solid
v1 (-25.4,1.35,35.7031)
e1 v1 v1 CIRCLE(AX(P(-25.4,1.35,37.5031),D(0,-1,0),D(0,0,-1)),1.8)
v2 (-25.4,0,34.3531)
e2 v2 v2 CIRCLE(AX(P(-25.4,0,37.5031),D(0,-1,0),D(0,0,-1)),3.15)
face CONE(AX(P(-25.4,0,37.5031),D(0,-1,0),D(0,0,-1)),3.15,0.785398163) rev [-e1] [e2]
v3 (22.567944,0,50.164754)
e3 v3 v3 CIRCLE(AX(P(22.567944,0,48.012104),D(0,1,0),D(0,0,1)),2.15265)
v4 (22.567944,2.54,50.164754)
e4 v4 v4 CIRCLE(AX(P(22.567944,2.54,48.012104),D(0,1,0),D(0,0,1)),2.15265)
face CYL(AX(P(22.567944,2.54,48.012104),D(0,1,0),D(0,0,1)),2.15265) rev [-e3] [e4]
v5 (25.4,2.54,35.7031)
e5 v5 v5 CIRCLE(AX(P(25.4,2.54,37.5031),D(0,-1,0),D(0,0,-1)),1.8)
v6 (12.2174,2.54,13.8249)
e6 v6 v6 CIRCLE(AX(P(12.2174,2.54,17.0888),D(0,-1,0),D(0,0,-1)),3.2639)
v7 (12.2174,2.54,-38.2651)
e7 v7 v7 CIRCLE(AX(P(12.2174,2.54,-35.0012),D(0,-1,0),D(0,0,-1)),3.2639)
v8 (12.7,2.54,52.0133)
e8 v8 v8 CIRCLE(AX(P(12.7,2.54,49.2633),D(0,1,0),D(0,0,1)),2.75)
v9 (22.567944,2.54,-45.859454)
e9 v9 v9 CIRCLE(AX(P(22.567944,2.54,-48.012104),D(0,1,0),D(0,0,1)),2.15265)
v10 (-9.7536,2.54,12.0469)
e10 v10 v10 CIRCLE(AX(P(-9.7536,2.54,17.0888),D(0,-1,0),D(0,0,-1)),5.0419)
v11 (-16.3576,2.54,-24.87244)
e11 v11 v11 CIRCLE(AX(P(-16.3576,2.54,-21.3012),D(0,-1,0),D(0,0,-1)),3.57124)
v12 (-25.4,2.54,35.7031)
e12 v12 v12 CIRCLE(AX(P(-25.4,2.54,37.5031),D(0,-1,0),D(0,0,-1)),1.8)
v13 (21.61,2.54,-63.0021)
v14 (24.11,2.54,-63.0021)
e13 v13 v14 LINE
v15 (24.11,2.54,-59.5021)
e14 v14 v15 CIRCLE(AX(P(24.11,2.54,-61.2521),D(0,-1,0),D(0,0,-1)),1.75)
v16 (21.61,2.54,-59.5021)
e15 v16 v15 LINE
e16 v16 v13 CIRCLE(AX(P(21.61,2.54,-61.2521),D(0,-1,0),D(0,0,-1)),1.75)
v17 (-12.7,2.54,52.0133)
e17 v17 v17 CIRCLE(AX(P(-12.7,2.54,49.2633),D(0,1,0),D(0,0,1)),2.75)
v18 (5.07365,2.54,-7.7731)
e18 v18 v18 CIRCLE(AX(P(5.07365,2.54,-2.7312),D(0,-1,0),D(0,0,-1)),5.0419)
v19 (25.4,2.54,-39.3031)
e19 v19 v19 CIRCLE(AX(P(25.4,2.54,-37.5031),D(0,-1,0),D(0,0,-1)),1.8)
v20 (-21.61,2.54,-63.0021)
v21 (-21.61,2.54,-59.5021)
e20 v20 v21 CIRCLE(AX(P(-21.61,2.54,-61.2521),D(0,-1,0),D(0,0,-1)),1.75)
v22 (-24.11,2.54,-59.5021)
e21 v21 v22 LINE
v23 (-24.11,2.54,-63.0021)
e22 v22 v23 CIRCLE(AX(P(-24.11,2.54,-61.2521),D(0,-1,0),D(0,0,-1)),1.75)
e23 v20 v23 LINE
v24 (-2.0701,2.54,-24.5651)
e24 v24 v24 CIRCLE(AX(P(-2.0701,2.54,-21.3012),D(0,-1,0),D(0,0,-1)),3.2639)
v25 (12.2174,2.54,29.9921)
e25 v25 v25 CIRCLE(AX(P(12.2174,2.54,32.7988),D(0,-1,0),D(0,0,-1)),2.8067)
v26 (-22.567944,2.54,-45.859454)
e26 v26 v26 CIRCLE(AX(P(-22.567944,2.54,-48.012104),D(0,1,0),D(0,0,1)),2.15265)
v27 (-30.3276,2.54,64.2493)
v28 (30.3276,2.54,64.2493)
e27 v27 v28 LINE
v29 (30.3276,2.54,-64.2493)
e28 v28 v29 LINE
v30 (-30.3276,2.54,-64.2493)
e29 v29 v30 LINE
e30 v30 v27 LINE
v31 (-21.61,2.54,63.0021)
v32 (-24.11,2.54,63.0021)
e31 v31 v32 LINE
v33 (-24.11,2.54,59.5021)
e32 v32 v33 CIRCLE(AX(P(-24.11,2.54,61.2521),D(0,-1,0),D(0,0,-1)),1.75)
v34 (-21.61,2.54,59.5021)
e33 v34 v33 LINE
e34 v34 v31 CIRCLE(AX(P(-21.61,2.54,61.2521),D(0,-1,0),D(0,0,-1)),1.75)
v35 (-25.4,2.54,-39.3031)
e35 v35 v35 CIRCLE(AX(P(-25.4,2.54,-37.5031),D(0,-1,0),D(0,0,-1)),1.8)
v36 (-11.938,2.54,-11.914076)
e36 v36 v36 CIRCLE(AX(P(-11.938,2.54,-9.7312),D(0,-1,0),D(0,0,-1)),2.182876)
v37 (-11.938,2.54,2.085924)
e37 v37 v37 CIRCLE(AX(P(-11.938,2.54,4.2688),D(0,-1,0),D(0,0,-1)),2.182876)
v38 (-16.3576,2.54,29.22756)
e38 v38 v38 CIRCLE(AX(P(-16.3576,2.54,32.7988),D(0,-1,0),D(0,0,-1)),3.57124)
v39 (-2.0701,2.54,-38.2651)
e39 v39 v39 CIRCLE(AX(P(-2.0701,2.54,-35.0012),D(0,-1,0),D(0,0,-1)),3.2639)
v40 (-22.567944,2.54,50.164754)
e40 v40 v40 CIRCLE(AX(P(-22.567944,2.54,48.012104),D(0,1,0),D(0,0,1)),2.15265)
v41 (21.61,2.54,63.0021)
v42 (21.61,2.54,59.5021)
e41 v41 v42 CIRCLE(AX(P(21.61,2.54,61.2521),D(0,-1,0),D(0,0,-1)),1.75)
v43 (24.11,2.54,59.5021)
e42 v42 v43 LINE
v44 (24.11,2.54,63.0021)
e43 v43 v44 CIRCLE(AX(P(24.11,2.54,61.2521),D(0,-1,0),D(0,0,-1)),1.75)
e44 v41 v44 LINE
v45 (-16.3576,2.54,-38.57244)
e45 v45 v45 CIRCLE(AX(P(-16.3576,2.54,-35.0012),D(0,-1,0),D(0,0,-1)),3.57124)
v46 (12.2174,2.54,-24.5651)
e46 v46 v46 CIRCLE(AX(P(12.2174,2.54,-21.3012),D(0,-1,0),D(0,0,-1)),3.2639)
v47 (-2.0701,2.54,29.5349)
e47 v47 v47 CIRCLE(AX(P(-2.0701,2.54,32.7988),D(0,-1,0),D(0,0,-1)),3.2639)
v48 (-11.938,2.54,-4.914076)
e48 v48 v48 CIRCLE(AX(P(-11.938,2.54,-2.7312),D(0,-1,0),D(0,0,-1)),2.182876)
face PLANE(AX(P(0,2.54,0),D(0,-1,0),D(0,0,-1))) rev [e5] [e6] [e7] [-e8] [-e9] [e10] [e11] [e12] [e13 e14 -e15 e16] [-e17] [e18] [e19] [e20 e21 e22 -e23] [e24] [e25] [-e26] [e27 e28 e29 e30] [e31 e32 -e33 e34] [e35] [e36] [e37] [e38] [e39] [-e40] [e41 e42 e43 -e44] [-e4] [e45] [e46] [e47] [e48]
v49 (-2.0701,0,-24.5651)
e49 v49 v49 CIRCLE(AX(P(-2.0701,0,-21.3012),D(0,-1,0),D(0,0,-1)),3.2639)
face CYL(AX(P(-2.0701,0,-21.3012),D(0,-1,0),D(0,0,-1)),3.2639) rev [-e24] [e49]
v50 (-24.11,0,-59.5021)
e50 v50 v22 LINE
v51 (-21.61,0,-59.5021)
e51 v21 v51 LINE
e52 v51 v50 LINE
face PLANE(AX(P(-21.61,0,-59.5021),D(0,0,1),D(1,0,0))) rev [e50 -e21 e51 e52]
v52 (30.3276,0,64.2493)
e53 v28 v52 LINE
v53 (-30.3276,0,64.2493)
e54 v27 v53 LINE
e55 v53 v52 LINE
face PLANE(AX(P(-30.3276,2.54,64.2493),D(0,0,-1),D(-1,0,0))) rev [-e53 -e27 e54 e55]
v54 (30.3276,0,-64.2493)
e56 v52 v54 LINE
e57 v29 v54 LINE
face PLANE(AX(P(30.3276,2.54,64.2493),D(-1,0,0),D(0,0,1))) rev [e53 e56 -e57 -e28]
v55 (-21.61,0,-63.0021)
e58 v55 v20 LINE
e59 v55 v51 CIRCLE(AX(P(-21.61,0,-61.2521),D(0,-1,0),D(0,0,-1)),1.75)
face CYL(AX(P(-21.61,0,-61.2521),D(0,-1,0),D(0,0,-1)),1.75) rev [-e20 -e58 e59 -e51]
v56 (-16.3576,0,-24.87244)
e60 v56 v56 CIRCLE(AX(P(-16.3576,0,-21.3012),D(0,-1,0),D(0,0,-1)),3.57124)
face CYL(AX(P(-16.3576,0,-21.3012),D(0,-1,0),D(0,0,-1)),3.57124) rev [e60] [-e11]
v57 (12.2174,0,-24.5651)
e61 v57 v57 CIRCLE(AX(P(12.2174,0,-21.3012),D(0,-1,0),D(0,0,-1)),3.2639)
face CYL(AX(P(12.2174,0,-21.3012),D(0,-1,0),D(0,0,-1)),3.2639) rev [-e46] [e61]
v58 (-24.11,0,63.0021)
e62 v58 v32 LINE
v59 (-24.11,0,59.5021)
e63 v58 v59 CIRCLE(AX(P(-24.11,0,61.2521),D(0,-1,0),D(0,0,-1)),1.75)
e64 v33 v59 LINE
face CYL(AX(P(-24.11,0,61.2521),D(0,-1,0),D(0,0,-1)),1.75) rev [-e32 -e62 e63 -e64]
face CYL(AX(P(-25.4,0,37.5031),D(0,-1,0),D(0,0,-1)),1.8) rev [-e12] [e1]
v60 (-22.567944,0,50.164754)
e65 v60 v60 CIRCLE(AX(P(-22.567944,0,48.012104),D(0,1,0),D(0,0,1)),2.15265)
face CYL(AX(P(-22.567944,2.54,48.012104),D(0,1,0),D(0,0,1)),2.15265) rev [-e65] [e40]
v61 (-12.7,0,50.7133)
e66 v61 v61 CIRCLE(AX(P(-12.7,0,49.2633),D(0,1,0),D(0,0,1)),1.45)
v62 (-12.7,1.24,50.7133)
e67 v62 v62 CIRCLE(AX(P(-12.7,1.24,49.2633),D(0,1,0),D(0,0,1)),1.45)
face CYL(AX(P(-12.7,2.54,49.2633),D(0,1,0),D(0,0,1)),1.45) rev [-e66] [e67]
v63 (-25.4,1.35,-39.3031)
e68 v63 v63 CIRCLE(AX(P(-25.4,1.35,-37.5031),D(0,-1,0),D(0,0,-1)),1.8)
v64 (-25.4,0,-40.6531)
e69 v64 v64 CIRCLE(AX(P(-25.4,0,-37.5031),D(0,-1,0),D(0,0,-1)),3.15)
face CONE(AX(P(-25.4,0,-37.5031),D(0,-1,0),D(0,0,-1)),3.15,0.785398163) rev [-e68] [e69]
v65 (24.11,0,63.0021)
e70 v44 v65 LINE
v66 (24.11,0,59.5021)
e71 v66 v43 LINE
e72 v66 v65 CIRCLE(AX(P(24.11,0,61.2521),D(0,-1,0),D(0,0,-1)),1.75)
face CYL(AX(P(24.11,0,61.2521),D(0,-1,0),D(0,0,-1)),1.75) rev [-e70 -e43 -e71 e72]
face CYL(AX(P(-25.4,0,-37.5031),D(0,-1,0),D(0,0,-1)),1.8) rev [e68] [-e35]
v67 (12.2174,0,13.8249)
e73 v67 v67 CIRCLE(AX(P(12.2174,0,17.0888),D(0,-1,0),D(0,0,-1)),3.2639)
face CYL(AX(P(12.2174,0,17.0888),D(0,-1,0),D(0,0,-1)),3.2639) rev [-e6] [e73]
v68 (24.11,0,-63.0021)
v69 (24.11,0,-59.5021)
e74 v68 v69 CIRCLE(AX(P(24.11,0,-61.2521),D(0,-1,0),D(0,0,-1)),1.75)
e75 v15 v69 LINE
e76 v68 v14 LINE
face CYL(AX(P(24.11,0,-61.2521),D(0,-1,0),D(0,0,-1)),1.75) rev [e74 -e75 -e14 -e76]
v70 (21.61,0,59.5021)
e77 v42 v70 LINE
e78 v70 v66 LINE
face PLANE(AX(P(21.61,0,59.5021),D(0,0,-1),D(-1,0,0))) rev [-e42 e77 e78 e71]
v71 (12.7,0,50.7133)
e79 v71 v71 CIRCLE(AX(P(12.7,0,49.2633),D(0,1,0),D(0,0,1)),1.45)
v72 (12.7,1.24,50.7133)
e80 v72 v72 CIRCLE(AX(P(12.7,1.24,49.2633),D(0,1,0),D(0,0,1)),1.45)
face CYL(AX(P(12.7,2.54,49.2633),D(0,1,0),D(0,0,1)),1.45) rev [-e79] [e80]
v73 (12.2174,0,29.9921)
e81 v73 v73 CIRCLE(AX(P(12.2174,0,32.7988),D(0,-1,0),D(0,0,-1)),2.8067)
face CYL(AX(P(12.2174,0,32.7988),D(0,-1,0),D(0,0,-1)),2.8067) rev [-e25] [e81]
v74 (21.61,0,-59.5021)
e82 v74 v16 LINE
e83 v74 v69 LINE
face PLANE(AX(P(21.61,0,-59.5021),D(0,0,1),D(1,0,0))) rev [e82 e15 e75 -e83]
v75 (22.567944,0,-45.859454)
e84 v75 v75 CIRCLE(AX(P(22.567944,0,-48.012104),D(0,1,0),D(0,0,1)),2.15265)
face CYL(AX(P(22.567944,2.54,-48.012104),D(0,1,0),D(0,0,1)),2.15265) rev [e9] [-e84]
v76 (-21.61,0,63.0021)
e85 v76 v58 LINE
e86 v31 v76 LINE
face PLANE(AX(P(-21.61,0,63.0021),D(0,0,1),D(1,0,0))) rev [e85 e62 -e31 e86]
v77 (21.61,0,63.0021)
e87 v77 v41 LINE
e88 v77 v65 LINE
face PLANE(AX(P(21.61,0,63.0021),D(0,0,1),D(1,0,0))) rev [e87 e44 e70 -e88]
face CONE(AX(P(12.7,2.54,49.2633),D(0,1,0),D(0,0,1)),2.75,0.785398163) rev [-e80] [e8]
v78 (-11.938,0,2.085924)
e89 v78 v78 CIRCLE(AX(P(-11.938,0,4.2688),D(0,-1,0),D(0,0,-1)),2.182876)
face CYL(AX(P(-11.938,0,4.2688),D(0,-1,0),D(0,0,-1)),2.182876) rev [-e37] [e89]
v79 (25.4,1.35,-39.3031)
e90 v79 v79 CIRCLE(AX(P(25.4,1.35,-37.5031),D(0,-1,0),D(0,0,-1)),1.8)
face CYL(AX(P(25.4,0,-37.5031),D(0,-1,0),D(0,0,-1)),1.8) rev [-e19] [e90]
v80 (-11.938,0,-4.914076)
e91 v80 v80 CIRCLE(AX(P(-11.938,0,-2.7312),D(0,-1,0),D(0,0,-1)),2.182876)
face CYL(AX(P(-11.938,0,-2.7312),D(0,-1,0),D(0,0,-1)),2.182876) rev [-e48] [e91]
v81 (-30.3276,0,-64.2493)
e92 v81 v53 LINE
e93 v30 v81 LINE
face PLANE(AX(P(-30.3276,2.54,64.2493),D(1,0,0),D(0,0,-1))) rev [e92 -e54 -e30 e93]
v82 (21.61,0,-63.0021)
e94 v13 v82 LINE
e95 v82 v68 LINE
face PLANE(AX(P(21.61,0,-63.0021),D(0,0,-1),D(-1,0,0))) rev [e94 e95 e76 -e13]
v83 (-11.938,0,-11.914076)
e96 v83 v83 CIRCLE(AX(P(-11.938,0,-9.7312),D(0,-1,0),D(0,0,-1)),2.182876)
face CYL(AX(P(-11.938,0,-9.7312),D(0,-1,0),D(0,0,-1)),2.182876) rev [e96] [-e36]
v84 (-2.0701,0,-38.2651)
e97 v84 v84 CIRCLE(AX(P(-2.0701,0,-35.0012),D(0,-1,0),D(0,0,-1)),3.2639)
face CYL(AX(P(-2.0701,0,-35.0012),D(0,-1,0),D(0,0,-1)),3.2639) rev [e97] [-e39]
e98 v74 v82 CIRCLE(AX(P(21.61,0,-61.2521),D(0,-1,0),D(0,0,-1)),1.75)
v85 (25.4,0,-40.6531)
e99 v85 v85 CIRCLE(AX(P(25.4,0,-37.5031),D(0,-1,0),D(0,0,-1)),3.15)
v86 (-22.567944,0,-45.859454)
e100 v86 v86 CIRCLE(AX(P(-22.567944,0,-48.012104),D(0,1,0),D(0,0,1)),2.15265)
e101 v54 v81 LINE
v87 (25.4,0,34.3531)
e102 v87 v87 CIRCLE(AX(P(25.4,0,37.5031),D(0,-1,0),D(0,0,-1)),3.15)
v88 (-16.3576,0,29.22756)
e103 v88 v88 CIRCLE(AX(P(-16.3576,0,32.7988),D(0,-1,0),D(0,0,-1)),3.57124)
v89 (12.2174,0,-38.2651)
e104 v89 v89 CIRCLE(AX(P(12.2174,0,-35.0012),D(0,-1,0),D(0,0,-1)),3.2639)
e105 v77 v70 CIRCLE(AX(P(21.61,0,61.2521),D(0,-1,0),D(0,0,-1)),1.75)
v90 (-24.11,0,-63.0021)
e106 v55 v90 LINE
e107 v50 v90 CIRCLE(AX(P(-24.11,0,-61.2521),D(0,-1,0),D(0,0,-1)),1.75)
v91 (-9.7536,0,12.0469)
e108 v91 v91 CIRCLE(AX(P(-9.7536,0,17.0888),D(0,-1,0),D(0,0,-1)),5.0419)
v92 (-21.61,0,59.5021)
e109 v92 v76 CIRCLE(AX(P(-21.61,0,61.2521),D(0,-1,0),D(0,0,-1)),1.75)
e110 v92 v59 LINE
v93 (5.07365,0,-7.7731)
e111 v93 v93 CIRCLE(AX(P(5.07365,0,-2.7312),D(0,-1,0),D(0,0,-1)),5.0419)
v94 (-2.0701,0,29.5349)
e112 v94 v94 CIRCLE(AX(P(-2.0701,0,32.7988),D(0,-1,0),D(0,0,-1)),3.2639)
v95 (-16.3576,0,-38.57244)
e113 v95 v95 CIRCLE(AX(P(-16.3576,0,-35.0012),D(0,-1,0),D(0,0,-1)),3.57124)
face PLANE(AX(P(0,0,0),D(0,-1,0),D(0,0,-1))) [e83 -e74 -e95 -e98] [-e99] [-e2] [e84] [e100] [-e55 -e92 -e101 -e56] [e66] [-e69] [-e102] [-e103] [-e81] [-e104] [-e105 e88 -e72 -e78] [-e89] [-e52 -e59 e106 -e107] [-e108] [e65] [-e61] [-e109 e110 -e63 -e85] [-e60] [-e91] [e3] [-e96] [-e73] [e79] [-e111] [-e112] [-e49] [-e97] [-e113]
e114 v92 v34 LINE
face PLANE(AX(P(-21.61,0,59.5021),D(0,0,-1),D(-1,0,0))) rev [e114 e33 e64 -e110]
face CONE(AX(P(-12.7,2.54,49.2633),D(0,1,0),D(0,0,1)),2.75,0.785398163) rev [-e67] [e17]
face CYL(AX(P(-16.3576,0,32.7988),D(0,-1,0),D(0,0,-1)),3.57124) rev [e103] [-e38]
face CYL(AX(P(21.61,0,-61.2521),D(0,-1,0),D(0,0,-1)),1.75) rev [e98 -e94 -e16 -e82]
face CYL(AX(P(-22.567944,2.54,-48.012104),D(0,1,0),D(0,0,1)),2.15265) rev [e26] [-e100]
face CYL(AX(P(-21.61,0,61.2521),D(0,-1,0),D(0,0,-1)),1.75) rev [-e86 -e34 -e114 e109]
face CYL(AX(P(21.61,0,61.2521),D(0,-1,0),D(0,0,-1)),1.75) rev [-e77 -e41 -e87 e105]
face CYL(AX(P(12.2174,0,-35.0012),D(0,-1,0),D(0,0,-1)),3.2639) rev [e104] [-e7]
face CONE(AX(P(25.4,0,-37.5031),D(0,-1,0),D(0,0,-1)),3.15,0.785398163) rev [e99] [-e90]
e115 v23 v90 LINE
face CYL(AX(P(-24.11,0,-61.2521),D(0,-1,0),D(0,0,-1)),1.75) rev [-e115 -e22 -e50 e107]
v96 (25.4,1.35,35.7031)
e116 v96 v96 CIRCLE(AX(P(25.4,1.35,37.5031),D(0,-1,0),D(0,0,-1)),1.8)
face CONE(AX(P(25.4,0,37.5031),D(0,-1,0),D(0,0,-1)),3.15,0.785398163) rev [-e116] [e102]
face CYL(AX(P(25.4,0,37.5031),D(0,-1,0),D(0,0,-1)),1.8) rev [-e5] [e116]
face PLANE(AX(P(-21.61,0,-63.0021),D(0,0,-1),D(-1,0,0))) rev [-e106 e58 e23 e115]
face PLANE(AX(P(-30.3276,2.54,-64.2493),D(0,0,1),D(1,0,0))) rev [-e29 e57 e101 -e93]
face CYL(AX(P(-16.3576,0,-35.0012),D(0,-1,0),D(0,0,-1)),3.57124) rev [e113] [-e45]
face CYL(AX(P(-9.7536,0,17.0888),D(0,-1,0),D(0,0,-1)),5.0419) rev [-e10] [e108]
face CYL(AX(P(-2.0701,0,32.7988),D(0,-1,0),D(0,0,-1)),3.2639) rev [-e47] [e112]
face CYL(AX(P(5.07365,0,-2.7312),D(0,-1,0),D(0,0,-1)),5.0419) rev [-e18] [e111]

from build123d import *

# Parameters (mm, degrees)
SKETCH1_W                                      = 60.6552
SKETCH1_H                                      = 128.4986
BOSS_EXTRUDE1_DEPTH                            = 2.54
CSK_FOR_M3_FLAT_HEAD_MACHINE_SCREW1_AT_2_COUNT = 2
CSK_FOR_M3_FLAT_HEAD_MACHINE_SCREW1_AT_2_PITCH = 75.0062
M3_CLEARANCE_SLOT1_DEPTH                       = 2.54
F_1_4_CLEARANCE_HOLE1_D                        = 7.14248
F_1_4_CLEARANCE_HOLE2_D                        = 6.5278
F_3_8_CLEARANCE_HOLE2_D                        = 10.0838
F_10_CLEARANCE_HOLE1_D                         = 5.6134
CSK_FOR_M2_5_FLAT_HEAD_MACHINE_SCREW1_AT_COUNT = 2
CSK_FOR_M2_5_FLAT_HEAD_MACHINE_SCREW1_AT_PITCH = 25.4
F_11_64_0_17188_DIAMETER_HOLE1_D               = 4.365752
F_6_CLEARANCE_HOLE1_D                          = 4.3053


# Read off the part's stored shape, not the designer's step: M3 Clearance Slot1
with BuildPart() as part:
    # Sketch1 → Boss-Extrude1 (new body)
    with BuildSketch(Plane(origin=(0, 0, 0), x_dir=(1, 0, 0), z_dir=(0, 1, 0))):
        Rectangle(SKETCH1_W, SKETCH1_H)
    extrude(amount=BOSS_EXTRUDE1_DEPTH)

    # Sketch5 → CSK for M3 Flat Head Machine Screw1 (revolve, cut)
    with BuildSketch(Plane(origin=(25.4, 0, -37.5031), x_dir=(0, 0, -1), z_dir=(1, 0, 0))):
        Polygon((0, 0), (0, 2.54), (1.8, 2.54), (1.8, 1.35), (3.15, 0), align=None)
    csk_for_m3_flat_head_machine_screw1 = revolve(axis=Axis((25.4, -6.35, -37.5031), (0, 1, 0)), mode=Mode.SUBTRACT)

    # CSK for M3 Flat Head Machine Screw1 at 2: CSK for M3 Flat Head Machine Screw1 ×2
    with Locations(*[(0, 0, i * CSK_FOR_M3_FLAT_HEAD_MACHINE_SCREW1_AT_2_PITCH) for i in range(1, CSK_FOR_M3_FLAT_HEAD_MACHINE_SCREW1_AT_2_COUNT)]):
        add(csk_for_m3_flat_head_machine_screw1, mode=Mode.SUBTRACT)

    # M3 Clearance Slot1 outline → M3 Clearance Slot1 (cut)
    with BuildSketch(Plane(origin=(0, 0, 0), x_dir=(1, 0, 0), z_dir=(0, 1, 0))):
        with BuildLine():
            ThreePointArc((24.11, -63.0021), (25.86, -61.2521), (24.11, -59.5021))
            Line((24.11, -59.5021), (21.61, -59.5021))
            ThreePointArc((21.61, -59.5021), (19.86, -61.2521), (21.61, -63.0021))
            Line((21.61, -63.0021), (24.11, -63.0021))
        make_face()
        with BuildLine():
            ThreePointArc((24.11, 59.5021), (25.86, 61.2521), (24.11, 63.0021))
            Line((24.11, 63.0021), (21.61, 63.0021))
            ThreePointArc((21.61, 63.0021), (19.86, 61.2521), (21.61, 59.5021))
            Line((21.61, 59.5021), (24.11, 59.5021))
        make_face()
    m3_clearance_slot1 = extrude(amount=M3_CLEARANCE_SLOT1_DEPTH, mode=Mode.SUBTRACT)

    # Mirror1: CSK for M3 Flat Head Machine Screw1, M3 Clearance Slot1 across plane
    add(csk_for_m3_flat_head_machine_screw1.mirror(Plane(origin=(0, 0, 0), x_dir=(0, 0, 1), z_dir=(1, 0, 0))), mode=Mode.SUBTRACT)
    add(m3_clearance_slot1.mirror(Plane(origin=(0, 0, 0), x_dir=(0, 0, 1), z_dir=(1, 0, 0))), mode=Mode.SUBTRACT)

    # Mirror1 copy 1 sketch → Mirror1 copy 1 (revolve, cut)
    with BuildSketch(Plane(origin=(-25.4, 0, 37.5031), x_dir=(0, 0, -1), z_dir=(-1, 0, 0))):
        Polygon((0, 0), (0, -2.54), (1.8, -2.54), (1.8, -1.35), (3.15, 0), align=None)
    revolve(axis=Axis((-25.4, -6.35, 37.5031), (0, -1, 0)), mode=Mode.SUBTRACT)

    # 1/4 Clearance Hole1 (through all)
    with Locations(Plane(origin=(0, 0, 0), x_dir=(-1, 0, 0), z_dir=(0, -1, 0))):
        with Locations((16.3576, 35.0012), (16.3576, 21.301199968), (16.3576, -32.798800036)):
            Hole(F_1_4_CLEARANCE_HOLE1_D / 2)

    # 1/4 Clearance Hole2 (through all)
    with Locations(Plane(origin=(0, 0, 0), x_dir=(-1, 0, 0), z_dir=(0, -1, 0))):
        with Locations((-12.2174, 35.0012), (2.0701, 35.0012), (2.0701, 21.301199968), (-12.2174, 21.301199968), (-12.2174, -17.08879996), (2.0701, -32.798800036)):
            Hole(F_1_4_CLEARANCE_HOLE2_D / 2)

    # 3/8 Clearance Hole2 (through all)
    with Locations(Plane(origin=(0, 0, 0), x_dir=(-1, 0, 0), z_dir=(0, -1, 0))):
        with Locations((9.7536, -17.08879996), (-5.07365, 2.731200024)):
            Hole(F_3_8_CLEARANCE_HOLE2_D / 2)

    # #10 Clearance Hole1 (through all)
    with Locations(Plane(origin=(0, 0, 0), x_dir=(-1, 0, 0), z_dir=(0, -1, 0))):
        with Locations((-12.2174, -32.798800036)):
            Hole(F_10_CLEARANCE_HOLE1_D / 2)

    # Sketch73 → CSK for M2.5 Flat Head Machine Screw1 (revolve, cut)
    with BuildSketch(Plane(origin=(-12.7, 2.54, 49.2633), x_dir=(0, 0, 1), z_dir=(1, 0, 0))):
        Polygon((0, 0), (0, 2.54), (1.45, 2.54), (1.45, 1.3), (2.75, 0), align=None)
    csk_for_m2_5_flat_head_machine_screw1 = revolve(axis=Axis((-12.7, 8.89, 49.2633), (0, -1, 0)), mode=Mode.SUBTRACT)

    # CSK for M2.5 Flat Head Machine Screw1 at: CSK for M2.5 Flat Head Machine Screw1 ×2
    with Locations(*[(i * CSK_FOR_M2_5_FLAT_HEAD_MACHINE_SCREW1_AT_PITCH, 0, 0) for i in range(1, CSK_FOR_M2_5_FLAT_HEAD_MACHINE_SCREW1_AT_COUNT)]):
        add(csk_for_m2_5_flat_head_machine_screw1, mode=Mode.SUBTRACT)

    # 11/64 (0.17188) Diameter Hole1 (through all)
    with Locations(Plane(origin=(0, 0, 0), x_dir=(-1, 0, 0), z_dir=(0, -1, 0))):
        with Locations((11.938, 9.731199994), (11.938, 2.731200024), (11.938, -4.268799946)):
            Hole(F_11_64_0_17188_DIAMETER_HOLE1_D / 2)

    # #6 Clearance Hole1 (through all)
    with Locations(Plane(origin=(0, 2.54, 0), x_dir=(1, 0, 0), z_dir=(0, 1, 0))):
        with Locations((-22.567944323, 48.012104001), (-22.567944323, -48.012104001)):
            f_6_clearance_hole1 = Hole(F_6_CLEARANCE_HOLE1_D / 2)

    # Mirror2: #6 Clearance Hole1 across plane
    add(f_6_clearance_hole1.mirror(Plane(origin=(0, 0, 0), x_dir=(0, 0, 1), z_dir=(1, 0, 0))), mode=Mode.SUBTRACT)


solid = part.part
